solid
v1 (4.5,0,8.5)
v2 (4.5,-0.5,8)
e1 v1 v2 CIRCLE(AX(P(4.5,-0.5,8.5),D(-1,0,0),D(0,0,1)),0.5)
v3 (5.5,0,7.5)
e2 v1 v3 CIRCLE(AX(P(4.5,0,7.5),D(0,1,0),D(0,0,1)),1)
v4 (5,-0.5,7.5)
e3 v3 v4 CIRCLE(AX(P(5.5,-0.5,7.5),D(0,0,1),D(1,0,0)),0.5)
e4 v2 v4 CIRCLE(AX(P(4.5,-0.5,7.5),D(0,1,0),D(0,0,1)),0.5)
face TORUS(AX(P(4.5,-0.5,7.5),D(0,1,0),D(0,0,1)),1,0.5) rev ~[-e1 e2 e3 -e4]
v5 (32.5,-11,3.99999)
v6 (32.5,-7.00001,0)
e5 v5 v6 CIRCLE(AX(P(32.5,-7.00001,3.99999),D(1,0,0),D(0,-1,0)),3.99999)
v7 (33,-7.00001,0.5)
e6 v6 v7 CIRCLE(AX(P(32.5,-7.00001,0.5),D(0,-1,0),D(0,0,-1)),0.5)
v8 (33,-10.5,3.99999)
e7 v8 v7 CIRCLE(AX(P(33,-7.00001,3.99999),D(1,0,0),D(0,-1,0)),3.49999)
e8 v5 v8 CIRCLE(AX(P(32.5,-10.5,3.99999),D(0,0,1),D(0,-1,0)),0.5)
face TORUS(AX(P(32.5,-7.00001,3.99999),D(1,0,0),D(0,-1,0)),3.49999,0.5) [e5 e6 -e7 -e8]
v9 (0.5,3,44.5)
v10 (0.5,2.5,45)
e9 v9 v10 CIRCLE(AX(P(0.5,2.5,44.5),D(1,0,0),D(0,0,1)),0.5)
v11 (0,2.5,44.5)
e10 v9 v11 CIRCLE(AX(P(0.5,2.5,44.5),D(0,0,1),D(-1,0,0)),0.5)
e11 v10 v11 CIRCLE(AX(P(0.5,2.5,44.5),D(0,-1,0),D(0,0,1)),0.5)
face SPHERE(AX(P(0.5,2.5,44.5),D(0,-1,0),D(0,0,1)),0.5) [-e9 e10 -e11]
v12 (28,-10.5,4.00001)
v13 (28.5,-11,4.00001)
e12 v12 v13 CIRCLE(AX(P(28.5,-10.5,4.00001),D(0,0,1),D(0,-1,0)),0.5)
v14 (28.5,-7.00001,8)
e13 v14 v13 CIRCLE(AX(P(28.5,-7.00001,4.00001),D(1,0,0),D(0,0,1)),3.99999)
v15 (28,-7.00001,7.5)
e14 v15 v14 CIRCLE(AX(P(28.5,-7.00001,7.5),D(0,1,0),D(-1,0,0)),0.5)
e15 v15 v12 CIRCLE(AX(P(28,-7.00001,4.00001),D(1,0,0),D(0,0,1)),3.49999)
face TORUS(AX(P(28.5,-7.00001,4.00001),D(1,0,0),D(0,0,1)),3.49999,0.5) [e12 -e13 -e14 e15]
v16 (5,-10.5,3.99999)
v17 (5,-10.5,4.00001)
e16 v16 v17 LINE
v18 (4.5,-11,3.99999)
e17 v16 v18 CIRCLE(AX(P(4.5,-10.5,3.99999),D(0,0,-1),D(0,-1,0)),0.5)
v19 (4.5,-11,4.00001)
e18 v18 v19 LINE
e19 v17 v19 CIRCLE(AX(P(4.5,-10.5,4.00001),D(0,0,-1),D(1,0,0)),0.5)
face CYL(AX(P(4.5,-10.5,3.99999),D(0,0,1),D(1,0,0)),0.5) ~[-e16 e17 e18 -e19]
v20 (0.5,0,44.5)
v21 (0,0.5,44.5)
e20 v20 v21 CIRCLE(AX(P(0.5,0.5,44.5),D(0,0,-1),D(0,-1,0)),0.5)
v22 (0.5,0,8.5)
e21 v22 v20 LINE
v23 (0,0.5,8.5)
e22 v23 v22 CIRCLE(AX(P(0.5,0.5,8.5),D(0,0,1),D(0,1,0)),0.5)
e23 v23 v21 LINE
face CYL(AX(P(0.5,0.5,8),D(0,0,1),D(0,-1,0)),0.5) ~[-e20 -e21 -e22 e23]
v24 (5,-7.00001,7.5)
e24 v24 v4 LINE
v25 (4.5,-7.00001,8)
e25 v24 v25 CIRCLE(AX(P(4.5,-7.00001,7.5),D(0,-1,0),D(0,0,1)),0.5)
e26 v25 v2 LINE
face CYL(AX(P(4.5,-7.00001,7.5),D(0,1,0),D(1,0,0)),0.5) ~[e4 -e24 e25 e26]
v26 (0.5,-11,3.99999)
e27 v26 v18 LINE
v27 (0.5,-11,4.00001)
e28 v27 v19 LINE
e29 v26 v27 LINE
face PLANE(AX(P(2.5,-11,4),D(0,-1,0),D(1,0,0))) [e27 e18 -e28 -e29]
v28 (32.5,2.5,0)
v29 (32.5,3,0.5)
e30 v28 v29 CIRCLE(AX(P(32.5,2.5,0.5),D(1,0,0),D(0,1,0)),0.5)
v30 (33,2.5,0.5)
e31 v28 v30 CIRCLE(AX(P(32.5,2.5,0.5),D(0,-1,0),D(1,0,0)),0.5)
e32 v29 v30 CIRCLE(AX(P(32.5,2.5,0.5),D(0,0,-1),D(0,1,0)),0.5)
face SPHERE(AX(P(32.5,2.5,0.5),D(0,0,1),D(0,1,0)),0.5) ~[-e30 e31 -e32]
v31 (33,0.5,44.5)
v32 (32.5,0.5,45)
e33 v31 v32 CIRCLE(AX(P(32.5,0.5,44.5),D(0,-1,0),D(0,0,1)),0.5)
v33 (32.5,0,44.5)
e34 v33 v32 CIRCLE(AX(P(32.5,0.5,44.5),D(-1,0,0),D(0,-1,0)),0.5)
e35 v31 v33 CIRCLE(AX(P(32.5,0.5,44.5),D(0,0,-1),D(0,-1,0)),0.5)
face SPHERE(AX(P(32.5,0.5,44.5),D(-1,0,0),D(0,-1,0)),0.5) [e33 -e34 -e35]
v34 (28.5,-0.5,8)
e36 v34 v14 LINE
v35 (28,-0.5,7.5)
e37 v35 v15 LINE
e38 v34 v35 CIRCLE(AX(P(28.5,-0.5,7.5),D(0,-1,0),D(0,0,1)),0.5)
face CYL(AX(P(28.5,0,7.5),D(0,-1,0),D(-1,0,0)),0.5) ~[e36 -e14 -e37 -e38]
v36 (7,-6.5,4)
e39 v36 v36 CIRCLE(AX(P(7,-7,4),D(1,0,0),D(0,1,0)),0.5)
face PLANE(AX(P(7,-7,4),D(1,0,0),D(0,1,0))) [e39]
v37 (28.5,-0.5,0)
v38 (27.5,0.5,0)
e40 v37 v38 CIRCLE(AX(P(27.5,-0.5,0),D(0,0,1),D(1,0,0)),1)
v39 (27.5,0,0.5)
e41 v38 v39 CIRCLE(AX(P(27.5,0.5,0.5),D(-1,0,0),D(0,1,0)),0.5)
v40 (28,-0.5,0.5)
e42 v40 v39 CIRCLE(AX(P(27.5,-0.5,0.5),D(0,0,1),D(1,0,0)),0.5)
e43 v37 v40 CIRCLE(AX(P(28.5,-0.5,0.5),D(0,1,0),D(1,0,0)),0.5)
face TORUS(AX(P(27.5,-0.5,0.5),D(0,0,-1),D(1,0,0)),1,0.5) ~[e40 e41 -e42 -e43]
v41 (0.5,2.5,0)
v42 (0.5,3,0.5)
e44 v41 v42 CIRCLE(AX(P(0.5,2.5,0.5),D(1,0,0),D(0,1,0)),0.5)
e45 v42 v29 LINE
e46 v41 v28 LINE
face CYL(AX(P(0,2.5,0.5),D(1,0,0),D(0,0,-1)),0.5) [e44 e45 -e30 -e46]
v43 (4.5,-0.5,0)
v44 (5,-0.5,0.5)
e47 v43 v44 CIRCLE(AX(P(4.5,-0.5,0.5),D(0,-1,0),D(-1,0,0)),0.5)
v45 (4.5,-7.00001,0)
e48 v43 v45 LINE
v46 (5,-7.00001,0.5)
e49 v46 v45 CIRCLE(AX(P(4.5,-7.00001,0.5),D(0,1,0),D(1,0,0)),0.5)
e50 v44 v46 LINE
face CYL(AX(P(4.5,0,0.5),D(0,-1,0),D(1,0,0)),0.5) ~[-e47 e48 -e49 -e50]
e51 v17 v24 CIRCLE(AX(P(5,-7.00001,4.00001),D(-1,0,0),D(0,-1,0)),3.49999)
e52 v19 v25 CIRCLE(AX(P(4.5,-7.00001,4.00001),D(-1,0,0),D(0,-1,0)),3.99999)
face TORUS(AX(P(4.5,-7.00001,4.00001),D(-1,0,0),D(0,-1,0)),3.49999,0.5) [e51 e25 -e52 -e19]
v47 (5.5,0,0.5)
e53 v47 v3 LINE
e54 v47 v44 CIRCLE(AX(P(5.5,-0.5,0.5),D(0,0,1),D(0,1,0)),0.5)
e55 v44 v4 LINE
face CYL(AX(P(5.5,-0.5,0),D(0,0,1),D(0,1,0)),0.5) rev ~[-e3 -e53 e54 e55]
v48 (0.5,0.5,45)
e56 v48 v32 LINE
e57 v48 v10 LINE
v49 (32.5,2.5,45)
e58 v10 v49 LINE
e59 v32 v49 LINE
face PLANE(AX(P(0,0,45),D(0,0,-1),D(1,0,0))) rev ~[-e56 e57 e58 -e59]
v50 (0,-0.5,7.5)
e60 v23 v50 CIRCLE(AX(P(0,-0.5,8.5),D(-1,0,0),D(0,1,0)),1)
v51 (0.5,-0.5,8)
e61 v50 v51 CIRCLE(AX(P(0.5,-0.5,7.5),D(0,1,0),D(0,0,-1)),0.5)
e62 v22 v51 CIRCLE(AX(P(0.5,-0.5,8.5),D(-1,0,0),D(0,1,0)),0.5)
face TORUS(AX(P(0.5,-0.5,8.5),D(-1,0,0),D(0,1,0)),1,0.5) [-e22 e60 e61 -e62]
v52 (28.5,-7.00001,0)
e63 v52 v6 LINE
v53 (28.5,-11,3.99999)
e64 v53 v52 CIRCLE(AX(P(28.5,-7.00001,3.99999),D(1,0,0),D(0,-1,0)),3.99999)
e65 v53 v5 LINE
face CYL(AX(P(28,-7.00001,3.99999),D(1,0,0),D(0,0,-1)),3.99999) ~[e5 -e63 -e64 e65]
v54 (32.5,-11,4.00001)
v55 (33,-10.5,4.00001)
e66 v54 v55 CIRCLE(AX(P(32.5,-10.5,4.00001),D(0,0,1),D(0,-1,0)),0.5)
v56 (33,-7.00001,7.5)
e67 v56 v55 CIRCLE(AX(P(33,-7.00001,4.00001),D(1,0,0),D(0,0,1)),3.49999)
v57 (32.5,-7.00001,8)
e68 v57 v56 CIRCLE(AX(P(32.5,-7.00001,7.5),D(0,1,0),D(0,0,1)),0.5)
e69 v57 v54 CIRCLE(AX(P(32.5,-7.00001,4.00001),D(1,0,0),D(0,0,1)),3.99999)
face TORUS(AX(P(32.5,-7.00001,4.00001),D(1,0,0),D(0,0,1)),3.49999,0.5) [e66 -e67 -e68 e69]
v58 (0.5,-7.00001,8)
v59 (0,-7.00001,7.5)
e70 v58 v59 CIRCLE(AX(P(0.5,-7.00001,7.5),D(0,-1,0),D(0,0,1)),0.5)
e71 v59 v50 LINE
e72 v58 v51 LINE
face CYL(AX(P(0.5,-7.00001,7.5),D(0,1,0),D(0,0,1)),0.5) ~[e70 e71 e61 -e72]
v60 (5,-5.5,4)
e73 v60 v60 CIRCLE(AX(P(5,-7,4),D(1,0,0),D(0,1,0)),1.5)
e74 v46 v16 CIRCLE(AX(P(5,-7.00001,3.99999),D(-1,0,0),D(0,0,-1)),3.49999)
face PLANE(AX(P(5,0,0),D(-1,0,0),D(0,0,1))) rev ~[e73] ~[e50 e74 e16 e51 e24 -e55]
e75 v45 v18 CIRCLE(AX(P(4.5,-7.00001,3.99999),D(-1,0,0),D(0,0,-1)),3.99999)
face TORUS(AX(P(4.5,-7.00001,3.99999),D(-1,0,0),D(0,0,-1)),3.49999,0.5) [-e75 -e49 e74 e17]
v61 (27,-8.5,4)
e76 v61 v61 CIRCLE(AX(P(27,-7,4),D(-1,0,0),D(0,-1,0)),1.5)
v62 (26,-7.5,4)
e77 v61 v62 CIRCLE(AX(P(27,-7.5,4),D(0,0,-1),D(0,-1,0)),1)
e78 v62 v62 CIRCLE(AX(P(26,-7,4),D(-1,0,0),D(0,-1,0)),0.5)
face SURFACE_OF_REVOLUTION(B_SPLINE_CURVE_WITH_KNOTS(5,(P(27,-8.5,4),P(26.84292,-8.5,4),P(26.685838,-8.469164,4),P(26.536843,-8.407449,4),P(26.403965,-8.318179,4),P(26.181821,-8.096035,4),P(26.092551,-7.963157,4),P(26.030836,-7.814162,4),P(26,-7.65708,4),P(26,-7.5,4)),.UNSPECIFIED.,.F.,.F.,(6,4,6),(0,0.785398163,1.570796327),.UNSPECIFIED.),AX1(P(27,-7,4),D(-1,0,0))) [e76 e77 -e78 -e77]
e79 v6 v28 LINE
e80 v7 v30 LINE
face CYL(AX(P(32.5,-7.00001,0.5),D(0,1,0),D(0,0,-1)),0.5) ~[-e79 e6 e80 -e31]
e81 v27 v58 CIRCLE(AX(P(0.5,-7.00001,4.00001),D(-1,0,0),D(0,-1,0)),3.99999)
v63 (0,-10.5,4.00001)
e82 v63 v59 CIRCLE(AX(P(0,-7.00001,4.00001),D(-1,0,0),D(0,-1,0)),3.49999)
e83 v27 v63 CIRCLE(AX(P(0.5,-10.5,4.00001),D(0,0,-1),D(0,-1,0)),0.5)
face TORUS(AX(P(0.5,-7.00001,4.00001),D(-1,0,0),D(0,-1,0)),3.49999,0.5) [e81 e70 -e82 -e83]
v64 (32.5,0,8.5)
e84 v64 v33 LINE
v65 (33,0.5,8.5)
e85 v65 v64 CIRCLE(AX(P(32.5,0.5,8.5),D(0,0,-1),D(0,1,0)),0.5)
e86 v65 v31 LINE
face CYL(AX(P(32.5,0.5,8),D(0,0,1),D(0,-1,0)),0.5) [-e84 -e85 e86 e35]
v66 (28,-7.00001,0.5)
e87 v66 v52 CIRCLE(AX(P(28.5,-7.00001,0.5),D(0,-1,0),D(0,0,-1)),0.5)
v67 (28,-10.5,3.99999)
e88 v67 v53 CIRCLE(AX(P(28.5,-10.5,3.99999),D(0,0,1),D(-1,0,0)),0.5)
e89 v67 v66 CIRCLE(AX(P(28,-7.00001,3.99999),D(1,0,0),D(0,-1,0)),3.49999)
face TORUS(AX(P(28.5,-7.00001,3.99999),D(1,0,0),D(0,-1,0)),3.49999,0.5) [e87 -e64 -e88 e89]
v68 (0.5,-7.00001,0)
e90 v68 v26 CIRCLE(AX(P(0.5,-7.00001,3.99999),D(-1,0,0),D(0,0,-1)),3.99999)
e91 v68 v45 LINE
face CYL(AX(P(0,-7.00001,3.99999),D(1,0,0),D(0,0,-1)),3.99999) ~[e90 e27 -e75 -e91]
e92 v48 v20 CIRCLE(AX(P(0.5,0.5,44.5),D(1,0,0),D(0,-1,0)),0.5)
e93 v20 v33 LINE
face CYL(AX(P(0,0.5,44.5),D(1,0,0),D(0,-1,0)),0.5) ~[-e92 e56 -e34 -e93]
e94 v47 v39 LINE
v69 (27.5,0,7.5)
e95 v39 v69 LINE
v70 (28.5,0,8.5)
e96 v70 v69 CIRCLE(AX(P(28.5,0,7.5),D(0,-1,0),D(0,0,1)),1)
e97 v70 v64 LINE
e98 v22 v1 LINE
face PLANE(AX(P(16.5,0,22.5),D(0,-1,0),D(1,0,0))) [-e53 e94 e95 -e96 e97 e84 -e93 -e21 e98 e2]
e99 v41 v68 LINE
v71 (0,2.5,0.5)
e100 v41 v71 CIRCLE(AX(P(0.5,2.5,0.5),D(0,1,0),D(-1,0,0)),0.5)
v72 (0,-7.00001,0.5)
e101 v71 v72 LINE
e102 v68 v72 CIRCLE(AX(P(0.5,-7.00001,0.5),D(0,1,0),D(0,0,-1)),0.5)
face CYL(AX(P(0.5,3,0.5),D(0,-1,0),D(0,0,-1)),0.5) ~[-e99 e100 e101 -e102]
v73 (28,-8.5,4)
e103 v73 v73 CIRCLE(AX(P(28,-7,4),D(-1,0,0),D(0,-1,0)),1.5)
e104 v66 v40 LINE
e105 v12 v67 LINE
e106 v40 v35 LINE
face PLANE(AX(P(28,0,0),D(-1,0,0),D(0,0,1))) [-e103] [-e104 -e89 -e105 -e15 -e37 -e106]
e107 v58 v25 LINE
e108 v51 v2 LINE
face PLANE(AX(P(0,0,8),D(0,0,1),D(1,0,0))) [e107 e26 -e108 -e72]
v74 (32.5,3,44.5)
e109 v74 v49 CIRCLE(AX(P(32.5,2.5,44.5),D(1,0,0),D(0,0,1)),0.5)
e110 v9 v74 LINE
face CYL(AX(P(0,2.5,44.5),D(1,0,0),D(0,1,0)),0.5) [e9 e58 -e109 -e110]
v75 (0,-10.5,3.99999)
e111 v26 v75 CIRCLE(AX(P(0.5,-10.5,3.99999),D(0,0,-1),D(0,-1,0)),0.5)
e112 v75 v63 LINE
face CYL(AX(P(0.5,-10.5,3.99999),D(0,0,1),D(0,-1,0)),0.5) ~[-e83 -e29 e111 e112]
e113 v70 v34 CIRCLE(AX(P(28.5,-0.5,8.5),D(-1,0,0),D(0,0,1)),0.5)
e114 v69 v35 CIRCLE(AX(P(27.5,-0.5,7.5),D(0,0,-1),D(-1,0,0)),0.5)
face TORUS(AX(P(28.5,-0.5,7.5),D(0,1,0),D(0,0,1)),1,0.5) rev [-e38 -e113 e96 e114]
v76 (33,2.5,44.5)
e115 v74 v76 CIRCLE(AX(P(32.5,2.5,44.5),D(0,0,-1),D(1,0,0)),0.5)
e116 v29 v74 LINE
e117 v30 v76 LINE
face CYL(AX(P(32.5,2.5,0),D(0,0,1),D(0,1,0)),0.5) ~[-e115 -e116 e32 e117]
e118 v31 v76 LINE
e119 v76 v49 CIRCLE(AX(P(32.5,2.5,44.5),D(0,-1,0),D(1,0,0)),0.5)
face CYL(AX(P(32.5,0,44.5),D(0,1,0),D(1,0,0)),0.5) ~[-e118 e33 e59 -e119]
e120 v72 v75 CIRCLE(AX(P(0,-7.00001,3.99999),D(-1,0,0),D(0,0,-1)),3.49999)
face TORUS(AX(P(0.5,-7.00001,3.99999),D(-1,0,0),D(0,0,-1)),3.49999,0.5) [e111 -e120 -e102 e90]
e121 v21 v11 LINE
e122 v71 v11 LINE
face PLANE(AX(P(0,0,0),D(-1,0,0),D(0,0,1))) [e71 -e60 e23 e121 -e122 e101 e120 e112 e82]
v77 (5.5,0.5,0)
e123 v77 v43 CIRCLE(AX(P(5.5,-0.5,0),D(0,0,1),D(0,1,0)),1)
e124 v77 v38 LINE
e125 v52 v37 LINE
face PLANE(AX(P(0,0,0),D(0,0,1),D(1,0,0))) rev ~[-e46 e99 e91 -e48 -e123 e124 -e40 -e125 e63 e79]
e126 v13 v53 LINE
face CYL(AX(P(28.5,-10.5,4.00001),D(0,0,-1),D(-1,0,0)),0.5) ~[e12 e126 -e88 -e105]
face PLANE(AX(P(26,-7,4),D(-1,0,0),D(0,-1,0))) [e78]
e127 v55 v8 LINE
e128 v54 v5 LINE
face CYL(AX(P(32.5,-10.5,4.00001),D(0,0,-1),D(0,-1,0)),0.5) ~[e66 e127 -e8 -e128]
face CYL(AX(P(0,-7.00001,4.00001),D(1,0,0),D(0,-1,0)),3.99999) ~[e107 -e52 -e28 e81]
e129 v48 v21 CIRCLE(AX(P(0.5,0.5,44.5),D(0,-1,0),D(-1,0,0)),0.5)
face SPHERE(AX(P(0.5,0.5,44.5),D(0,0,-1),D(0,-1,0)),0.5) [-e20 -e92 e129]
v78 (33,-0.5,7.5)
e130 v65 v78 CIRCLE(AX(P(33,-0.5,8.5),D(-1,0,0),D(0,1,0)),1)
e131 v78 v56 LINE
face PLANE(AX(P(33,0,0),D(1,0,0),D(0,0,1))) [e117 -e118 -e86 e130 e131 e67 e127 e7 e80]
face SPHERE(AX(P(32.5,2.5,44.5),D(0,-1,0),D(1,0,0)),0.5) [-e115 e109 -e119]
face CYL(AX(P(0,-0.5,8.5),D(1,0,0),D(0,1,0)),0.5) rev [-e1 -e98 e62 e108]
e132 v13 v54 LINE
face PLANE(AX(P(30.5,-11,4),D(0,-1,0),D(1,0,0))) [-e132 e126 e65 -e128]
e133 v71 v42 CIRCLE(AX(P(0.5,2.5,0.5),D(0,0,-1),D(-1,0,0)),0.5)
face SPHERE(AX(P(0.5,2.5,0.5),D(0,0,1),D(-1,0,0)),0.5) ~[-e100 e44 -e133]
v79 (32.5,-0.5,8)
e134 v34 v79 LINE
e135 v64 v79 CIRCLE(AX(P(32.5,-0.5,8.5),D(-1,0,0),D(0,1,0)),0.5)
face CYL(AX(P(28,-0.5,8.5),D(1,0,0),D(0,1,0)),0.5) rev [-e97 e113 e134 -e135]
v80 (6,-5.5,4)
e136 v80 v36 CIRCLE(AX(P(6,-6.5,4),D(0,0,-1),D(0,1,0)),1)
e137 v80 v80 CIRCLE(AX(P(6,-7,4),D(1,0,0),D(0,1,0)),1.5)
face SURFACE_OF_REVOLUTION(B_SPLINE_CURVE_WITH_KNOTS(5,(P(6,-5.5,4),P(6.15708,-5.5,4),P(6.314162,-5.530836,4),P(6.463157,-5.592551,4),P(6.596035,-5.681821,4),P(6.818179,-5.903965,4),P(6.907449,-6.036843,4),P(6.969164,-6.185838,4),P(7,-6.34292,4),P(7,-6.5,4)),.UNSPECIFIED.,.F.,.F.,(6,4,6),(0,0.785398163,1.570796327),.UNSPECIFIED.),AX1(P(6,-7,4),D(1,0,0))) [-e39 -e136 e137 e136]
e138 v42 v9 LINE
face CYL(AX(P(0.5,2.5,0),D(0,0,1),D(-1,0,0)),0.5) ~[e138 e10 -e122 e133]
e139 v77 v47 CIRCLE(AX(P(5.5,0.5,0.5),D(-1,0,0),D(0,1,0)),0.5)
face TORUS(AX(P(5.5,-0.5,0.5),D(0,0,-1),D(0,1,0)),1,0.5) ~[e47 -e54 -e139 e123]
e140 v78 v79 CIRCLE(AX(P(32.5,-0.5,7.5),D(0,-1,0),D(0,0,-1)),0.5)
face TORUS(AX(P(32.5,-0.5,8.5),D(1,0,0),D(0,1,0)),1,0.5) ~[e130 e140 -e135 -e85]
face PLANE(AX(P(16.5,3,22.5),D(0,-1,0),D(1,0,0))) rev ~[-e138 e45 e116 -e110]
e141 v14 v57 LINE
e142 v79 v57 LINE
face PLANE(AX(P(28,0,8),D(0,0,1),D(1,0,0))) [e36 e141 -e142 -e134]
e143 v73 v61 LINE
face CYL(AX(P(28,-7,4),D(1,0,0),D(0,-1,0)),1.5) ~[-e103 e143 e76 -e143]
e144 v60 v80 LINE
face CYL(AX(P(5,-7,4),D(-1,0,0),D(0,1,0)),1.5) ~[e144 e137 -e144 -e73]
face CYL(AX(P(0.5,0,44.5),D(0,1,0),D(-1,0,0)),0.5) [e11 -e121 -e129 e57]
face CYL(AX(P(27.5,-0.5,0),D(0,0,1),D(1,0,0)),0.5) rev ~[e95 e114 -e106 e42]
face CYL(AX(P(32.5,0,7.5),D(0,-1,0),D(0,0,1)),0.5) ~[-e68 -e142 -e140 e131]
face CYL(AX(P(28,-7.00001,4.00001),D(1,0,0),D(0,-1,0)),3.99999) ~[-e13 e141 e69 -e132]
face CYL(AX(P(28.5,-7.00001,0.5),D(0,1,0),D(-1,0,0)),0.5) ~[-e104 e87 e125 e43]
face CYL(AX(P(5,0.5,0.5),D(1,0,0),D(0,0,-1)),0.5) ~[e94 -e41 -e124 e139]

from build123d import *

# Parameters (mm, degrees)
F0_W     = 33
F0_H     = 45
F1_DEPTH = 3
F2_W     = 5
F2_H     = 8
F3_DEPTH = 11
F4_R     = 1.5
F5_DEPTH = 2
F6_R     = 1
F7_R     = 1.5
F8_DEPTH = 2
F9_R     = 1
F10_R    = 3.99999
F11_R    = 0.5


# Not quite as in the source:
# - a fillet or chamfer is up to 0.001 mm smaller than in the source, because OpenCascade refuses the exact size


with BuildPart() as f1:
    # F0 (on Front) → F1 (new body)
    with BuildSketch(Plane.XZ):
        with Locations((16.5, 22.5)):
            Rectangle(F0_W, F0_H)
    extrude(amount=-F1_DEPTH)

    # F2 (on face) → F3 (join)
    with BuildSketch(Plane.XZ):
        with Locations((2.5, 4)):
            Rectangle(F2_W, F2_H)
        with Locations((30.5, 4)):
            Rectangle(F2_W, F2_H)
    extrude(amount=F3_DEPTH)

    # F4 (on face) → F5 (join)
    with BuildSketch(Plane.YZ.offset(5)):
        with Locations((-7, 4)):
            Circle(F4_R)
    extrude(amount=F5_DEPTH)

    # F6
    f6_edges = [f1.edges().sort_by_distance(p)[0] for p in [
        (7, -8.5, 4),
    ]]
    fillet(f6_edges, radius=F6_R)

    # F7 (on face) → F8 (join)
    with BuildSketch(Plane(origin=(28, 0, 0), x_dir=(0, -1, 0), z_dir=(-1, 0, 0))):
        with Locations((7, 4)):
            Circle(F7_R)
    extrude(amount=F8_DEPTH)

    # F9
    f9_edges = [f1.edges().sort_by_distance(p)[0] for p in [
        (26, -5.5, 4),
    ]]
    fillet(f9_edges, radius=F9_R)

    # F10 (radius 4 in the source; OpenCascade refuses exactly that, so slightly less here)
    f10_edges = [f1.edges().sort_by_distance(p)[0] for p in [
        (2.5, -11, 8),
        (2.5, -11, 0),
        (30.5, -11, 8),
        (30.5, -11, 0),
    ]]
    fillet(f10_edges, radius=F10_R)

    # F11
    f11_edges = [f1.edges().sort_by_distance(p)[0] for p in [
        (0, 0, 26.5),
        (16.5, 0, 45),
        (33, 0, 26.5),
        (33, 1.5, 45),
        (33, 3, 22.5),
        (0, 1.5, 45),
        (16.5, 3, 45),
        (0, 3, 22.5),
        (16.5, 0, 0),
        (28, 0, 4),
        (0, -2.000005, 0),
        (0, -9.82843, 1.17157),
        (0, -3.500005, 8),
        (5, -9.82843, 1.17157),
        (5, -3.500005, 0),
        (16.5, 3, 0),
        (5, -3.500005, 8),
        (2.5, 0, 8),
        (28, -3.500005, 8),
        (28, -9.82843, 6.82843),
        (28, -11, 4),
        (28, -3.500005, 0),
        (28, -9.82843, 1.17157),
        (33, -3.500005, 8),
        (30.5, 0, 8),
        (33, -9.82843, 6.82843),
        (5, 0, 4),
        (33, -11, 4),
        (33, -2.000005, 0),
        (33, -9.82843, 1.17157),
        (5, -11, 4),
        (5, -9.82843, 6.82843),
        (0, -11, 4),
        (0, -9.82843, 6.82843),
    ]]
    fillet(f11_edges, radius=F11_R)


solid = f1.part
